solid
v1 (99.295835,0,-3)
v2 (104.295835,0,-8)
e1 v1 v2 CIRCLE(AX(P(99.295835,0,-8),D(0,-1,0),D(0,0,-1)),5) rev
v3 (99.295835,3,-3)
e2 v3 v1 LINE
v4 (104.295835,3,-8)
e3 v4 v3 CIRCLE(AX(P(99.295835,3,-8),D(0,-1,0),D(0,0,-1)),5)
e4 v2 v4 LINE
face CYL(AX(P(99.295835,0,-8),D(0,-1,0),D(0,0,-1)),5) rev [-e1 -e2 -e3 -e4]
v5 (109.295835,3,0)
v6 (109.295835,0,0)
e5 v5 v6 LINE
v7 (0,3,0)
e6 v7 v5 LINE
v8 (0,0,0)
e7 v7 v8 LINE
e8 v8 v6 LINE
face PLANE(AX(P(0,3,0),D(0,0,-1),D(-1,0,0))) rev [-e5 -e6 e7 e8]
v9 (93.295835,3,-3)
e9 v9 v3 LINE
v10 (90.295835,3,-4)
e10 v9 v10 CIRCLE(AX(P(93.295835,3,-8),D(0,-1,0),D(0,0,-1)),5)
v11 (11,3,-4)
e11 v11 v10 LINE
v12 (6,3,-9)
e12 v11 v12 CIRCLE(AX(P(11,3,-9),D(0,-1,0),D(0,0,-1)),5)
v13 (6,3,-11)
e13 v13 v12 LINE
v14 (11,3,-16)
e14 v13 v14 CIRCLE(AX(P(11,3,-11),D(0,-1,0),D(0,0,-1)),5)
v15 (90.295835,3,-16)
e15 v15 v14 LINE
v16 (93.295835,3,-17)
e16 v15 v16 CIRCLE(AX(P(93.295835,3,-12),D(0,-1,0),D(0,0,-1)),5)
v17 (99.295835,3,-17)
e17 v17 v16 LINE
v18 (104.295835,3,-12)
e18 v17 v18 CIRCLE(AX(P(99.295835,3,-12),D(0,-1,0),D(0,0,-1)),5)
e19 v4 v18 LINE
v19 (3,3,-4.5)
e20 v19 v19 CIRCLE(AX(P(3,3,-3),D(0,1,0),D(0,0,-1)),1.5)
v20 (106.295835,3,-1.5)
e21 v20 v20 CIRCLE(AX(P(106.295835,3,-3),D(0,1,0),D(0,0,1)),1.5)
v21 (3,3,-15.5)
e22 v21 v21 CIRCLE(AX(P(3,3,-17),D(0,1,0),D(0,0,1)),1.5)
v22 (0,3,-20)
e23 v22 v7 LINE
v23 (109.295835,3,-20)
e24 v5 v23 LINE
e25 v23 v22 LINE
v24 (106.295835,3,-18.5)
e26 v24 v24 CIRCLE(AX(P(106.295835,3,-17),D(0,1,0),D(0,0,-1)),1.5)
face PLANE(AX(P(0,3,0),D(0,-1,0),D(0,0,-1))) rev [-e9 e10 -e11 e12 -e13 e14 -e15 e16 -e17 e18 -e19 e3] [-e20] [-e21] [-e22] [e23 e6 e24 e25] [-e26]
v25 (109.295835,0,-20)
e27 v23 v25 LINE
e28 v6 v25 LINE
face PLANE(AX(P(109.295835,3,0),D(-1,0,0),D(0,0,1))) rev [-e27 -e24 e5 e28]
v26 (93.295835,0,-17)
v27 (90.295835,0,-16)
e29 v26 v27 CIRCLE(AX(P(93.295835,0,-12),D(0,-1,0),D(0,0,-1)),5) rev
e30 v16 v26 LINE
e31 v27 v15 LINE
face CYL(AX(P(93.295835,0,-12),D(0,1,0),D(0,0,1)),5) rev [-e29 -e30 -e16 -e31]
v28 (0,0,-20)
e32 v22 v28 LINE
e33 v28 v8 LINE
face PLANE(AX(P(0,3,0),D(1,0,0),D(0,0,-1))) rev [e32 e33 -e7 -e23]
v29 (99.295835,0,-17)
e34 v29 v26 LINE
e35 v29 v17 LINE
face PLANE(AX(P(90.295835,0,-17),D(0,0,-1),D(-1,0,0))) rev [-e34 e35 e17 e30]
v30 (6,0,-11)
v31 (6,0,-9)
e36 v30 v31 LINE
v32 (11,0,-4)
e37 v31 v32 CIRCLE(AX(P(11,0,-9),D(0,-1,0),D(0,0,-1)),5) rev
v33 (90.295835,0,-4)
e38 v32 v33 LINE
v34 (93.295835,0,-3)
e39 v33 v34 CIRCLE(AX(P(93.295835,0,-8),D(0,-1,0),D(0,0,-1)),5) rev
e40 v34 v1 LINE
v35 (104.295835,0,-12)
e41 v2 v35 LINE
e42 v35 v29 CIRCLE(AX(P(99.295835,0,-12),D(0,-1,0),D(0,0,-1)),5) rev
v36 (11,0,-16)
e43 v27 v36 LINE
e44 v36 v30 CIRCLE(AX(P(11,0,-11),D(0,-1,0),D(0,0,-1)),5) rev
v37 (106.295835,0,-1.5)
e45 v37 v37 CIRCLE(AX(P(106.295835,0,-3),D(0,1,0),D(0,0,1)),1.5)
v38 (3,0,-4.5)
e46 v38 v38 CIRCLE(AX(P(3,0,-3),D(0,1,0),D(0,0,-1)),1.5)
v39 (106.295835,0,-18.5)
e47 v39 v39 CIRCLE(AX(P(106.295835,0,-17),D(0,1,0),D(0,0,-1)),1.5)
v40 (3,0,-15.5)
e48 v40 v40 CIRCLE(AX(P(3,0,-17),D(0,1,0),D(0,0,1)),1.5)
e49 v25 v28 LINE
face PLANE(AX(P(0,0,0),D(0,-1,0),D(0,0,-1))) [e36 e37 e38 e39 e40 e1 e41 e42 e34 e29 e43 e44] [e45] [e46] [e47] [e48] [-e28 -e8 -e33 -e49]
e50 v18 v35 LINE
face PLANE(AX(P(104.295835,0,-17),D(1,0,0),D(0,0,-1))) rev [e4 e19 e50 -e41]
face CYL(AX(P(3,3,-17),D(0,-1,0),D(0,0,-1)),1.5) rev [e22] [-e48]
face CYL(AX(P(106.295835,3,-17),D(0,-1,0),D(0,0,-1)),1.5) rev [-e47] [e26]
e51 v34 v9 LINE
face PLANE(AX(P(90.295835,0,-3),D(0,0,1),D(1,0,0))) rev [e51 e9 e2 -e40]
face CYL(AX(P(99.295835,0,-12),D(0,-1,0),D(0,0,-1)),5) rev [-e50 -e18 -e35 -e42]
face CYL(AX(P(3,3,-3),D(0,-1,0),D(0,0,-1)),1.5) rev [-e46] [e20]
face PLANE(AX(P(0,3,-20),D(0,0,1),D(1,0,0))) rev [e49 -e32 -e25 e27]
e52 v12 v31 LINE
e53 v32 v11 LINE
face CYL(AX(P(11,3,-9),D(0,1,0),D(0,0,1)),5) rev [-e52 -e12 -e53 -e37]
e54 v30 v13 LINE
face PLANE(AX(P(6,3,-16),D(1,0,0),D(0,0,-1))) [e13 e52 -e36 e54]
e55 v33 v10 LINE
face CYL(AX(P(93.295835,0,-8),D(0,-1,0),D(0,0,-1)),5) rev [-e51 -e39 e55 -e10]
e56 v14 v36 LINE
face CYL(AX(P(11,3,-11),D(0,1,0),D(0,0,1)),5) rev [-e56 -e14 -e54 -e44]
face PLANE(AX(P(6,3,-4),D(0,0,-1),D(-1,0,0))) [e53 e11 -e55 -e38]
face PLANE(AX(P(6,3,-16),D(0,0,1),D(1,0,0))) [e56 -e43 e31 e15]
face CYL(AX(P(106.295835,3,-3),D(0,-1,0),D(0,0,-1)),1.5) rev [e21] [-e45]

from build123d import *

# Parameters (mm, degrees)
SKETCH1_W           = 109.295835398
SKETCH1_H           = 20
SKETCH1_R           = 1.5
SKETCH1_W_2         = 97.295835398
SKETCH1_H_2         = 12
BOSS_EXTRUDE1_DEPTH = 3
CUT_EXTRUDE1_DEPTH  = 112.151156699
FILLET1_R           = 5


with BuildPart() as part:
    # Sketch1 → Boss-Extrude1 (new body)
    with BuildSketch(Plane(origin=(0, 0, 0), x_dir=(1, 0, 0), z_dir=(0, 1, 0))):
        with Locations((54.647917699, 10)):
            Rectangle(SKETCH1_W, SKETCH1_H)
        with Locations(Location((3, 17, 0), (0, 0, 270))):
            Circle(SKETCH1_R, mode=Mode.SUBTRACT)
        with Locations(Location((3, 3, 0), (0, 0, 90))):
            Circle(SKETCH1_R, mode=Mode.SUBTRACT)
        with Locations(Location((106.295835398, 3, 0), (0, 0, 270))):
            Circle(SKETCH1_R, mode=Mode.SUBTRACT)
        with Locations(Location((106.295835398, 17, 0), (0, 0, 90))):
            Circle(SKETCH1_R, mode=Mode.SUBTRACT)
        with Locations((54.647917699, 10)):
            Rectangle(SKETCH1_W_2, SKETCH1_H_2, mode=Mode.SUBTRACT)
    extrude(amount=BOSS_EXTRUDE1_DEPTH)

    # Sketch2 → Cut-Extrude1 (cut, through all)
    with BuildSketch(Plane(origin=(0, 3, 0), x_dir=(1, 0, 0), z_dir=(0, 1, 0))):
        Polygon((90.295835398, 17), (90.295835398, 16), (103.295835398, 16), (103.295835398, 4), (90.295835398, 4), (90.295835398, 3), (104.295835398, 3), (104.295835398, 17), align=None)
    extrude(amount=-CUT_EXTRUDE1_DEPTH, mode=Mode.SUBTRACT)

    # Fillet1
    # the kernel refuses this fillet: 5 mm, written as the material it adds along each edge
    with BuildSketch(Plane(origin=(104.295835398, 3, -17), x_dir=(0, 0, 1), z_dir=(0, -1, 0)), Plane(origin=(104.295835398, 3, -3), x_dir=(-1, 0, 0), z_dir=(0, -1, 0)), Plane(origin=(6, 0, -16), x_dir=(0, 0, 1), z_dir=(0, 1, 0))) as fillet1_piece_1:
        with BuildLine():
            CenterArc((FILLET1_R, FILLET1_R), FILLET1_R, 180, 90)
            Line((0, FILLET1_R), (-FILLET1_R * 0.02, FILLET1_R))
            Line((-FILLET1_R * 0.02, FILLET1_R), (-FILLET1_R * 0.02, -FILLET1_R * 0.02))
            Line((-FILLET1_R * 0.02, -FILLET1_R * 0.02), (FILLET1_R, -FILLET1_R * 0.02))
            Line((FILLET1_R, -FILLET1_R * 0.02), (FILLET1_R, 0))
        make_face()
    extrude(amount=3)
    with BuildSketch(Plane(origin=(90.295835398, 3, -17), x_dir=(1, 0, 0), z_dir=(0, -1, 0))) as fillet1_piece_2:
        with BuildLine():
            CenterArc((3, 5), FILLET1_R, 233.130102354, 36.869897646)
            Line((0, 1), (-0.06, 0.92))
            ThreePointArc((-0.06, 0.92), (-0.1, 0.5), (-0.1, 0))
            Line((-0.1, 0), (0, -0.1))
            Line((0, -0.1), (3, -0.1))
            Line((3, -0.1), (3, 0))
        make_face()
    extrude(amount=3)
    with BuildSketch(Plane(origin=(90.295835398, 3, -3), x_dir=(0, 0, -1), z_dir=(0, -1, 0))) as fillet1_piece_3:
        with BuildLine():
            CenterArc((5, 3), FILLET1_R, 180, 36.869897646)
            Line((0, 3), (-0.1, 3))
            Line((-0.1, 3), (-0.1, 0))
            Line((-0.1, 0), (0, -0.1))
            ThreePointArc((0, -0.1), (0.5, -0.1), (0.92, -0.06))
            Line((0.92, -0.06), (1, 0))
        make_face()
    extrude(amount=3)
    with BuildSketch(Plane(origin=(6, 0, -4), x_dir=(0, 0, -1), z_dir=(0, 1, 0))) as fillet1_piece_4:
        with BuildLine():
            CenterArc((FILLET1_R, -FILLET1_R), FILLET1_R, 90, 90)
            Line((0, -FILLET1_R), (-FILLET1_R * 0.02, -FILLET1_R))
            Line((-FILLET1_R * 0.02, -FILLET1_R), (-FILLET1_R * 0.02, FILLET1_R * 0.02))
            Line((-FILLET1_R * 0.02, FILLET1_R * 0.02), (FILLET1_R, FILLET1_R * 0.02))
            Line((FILLET1_R, FILLET1_R * 0.02), (FILLET1_R, 0))
        make_face()
    extrude(amount=3)


solid = part.part
